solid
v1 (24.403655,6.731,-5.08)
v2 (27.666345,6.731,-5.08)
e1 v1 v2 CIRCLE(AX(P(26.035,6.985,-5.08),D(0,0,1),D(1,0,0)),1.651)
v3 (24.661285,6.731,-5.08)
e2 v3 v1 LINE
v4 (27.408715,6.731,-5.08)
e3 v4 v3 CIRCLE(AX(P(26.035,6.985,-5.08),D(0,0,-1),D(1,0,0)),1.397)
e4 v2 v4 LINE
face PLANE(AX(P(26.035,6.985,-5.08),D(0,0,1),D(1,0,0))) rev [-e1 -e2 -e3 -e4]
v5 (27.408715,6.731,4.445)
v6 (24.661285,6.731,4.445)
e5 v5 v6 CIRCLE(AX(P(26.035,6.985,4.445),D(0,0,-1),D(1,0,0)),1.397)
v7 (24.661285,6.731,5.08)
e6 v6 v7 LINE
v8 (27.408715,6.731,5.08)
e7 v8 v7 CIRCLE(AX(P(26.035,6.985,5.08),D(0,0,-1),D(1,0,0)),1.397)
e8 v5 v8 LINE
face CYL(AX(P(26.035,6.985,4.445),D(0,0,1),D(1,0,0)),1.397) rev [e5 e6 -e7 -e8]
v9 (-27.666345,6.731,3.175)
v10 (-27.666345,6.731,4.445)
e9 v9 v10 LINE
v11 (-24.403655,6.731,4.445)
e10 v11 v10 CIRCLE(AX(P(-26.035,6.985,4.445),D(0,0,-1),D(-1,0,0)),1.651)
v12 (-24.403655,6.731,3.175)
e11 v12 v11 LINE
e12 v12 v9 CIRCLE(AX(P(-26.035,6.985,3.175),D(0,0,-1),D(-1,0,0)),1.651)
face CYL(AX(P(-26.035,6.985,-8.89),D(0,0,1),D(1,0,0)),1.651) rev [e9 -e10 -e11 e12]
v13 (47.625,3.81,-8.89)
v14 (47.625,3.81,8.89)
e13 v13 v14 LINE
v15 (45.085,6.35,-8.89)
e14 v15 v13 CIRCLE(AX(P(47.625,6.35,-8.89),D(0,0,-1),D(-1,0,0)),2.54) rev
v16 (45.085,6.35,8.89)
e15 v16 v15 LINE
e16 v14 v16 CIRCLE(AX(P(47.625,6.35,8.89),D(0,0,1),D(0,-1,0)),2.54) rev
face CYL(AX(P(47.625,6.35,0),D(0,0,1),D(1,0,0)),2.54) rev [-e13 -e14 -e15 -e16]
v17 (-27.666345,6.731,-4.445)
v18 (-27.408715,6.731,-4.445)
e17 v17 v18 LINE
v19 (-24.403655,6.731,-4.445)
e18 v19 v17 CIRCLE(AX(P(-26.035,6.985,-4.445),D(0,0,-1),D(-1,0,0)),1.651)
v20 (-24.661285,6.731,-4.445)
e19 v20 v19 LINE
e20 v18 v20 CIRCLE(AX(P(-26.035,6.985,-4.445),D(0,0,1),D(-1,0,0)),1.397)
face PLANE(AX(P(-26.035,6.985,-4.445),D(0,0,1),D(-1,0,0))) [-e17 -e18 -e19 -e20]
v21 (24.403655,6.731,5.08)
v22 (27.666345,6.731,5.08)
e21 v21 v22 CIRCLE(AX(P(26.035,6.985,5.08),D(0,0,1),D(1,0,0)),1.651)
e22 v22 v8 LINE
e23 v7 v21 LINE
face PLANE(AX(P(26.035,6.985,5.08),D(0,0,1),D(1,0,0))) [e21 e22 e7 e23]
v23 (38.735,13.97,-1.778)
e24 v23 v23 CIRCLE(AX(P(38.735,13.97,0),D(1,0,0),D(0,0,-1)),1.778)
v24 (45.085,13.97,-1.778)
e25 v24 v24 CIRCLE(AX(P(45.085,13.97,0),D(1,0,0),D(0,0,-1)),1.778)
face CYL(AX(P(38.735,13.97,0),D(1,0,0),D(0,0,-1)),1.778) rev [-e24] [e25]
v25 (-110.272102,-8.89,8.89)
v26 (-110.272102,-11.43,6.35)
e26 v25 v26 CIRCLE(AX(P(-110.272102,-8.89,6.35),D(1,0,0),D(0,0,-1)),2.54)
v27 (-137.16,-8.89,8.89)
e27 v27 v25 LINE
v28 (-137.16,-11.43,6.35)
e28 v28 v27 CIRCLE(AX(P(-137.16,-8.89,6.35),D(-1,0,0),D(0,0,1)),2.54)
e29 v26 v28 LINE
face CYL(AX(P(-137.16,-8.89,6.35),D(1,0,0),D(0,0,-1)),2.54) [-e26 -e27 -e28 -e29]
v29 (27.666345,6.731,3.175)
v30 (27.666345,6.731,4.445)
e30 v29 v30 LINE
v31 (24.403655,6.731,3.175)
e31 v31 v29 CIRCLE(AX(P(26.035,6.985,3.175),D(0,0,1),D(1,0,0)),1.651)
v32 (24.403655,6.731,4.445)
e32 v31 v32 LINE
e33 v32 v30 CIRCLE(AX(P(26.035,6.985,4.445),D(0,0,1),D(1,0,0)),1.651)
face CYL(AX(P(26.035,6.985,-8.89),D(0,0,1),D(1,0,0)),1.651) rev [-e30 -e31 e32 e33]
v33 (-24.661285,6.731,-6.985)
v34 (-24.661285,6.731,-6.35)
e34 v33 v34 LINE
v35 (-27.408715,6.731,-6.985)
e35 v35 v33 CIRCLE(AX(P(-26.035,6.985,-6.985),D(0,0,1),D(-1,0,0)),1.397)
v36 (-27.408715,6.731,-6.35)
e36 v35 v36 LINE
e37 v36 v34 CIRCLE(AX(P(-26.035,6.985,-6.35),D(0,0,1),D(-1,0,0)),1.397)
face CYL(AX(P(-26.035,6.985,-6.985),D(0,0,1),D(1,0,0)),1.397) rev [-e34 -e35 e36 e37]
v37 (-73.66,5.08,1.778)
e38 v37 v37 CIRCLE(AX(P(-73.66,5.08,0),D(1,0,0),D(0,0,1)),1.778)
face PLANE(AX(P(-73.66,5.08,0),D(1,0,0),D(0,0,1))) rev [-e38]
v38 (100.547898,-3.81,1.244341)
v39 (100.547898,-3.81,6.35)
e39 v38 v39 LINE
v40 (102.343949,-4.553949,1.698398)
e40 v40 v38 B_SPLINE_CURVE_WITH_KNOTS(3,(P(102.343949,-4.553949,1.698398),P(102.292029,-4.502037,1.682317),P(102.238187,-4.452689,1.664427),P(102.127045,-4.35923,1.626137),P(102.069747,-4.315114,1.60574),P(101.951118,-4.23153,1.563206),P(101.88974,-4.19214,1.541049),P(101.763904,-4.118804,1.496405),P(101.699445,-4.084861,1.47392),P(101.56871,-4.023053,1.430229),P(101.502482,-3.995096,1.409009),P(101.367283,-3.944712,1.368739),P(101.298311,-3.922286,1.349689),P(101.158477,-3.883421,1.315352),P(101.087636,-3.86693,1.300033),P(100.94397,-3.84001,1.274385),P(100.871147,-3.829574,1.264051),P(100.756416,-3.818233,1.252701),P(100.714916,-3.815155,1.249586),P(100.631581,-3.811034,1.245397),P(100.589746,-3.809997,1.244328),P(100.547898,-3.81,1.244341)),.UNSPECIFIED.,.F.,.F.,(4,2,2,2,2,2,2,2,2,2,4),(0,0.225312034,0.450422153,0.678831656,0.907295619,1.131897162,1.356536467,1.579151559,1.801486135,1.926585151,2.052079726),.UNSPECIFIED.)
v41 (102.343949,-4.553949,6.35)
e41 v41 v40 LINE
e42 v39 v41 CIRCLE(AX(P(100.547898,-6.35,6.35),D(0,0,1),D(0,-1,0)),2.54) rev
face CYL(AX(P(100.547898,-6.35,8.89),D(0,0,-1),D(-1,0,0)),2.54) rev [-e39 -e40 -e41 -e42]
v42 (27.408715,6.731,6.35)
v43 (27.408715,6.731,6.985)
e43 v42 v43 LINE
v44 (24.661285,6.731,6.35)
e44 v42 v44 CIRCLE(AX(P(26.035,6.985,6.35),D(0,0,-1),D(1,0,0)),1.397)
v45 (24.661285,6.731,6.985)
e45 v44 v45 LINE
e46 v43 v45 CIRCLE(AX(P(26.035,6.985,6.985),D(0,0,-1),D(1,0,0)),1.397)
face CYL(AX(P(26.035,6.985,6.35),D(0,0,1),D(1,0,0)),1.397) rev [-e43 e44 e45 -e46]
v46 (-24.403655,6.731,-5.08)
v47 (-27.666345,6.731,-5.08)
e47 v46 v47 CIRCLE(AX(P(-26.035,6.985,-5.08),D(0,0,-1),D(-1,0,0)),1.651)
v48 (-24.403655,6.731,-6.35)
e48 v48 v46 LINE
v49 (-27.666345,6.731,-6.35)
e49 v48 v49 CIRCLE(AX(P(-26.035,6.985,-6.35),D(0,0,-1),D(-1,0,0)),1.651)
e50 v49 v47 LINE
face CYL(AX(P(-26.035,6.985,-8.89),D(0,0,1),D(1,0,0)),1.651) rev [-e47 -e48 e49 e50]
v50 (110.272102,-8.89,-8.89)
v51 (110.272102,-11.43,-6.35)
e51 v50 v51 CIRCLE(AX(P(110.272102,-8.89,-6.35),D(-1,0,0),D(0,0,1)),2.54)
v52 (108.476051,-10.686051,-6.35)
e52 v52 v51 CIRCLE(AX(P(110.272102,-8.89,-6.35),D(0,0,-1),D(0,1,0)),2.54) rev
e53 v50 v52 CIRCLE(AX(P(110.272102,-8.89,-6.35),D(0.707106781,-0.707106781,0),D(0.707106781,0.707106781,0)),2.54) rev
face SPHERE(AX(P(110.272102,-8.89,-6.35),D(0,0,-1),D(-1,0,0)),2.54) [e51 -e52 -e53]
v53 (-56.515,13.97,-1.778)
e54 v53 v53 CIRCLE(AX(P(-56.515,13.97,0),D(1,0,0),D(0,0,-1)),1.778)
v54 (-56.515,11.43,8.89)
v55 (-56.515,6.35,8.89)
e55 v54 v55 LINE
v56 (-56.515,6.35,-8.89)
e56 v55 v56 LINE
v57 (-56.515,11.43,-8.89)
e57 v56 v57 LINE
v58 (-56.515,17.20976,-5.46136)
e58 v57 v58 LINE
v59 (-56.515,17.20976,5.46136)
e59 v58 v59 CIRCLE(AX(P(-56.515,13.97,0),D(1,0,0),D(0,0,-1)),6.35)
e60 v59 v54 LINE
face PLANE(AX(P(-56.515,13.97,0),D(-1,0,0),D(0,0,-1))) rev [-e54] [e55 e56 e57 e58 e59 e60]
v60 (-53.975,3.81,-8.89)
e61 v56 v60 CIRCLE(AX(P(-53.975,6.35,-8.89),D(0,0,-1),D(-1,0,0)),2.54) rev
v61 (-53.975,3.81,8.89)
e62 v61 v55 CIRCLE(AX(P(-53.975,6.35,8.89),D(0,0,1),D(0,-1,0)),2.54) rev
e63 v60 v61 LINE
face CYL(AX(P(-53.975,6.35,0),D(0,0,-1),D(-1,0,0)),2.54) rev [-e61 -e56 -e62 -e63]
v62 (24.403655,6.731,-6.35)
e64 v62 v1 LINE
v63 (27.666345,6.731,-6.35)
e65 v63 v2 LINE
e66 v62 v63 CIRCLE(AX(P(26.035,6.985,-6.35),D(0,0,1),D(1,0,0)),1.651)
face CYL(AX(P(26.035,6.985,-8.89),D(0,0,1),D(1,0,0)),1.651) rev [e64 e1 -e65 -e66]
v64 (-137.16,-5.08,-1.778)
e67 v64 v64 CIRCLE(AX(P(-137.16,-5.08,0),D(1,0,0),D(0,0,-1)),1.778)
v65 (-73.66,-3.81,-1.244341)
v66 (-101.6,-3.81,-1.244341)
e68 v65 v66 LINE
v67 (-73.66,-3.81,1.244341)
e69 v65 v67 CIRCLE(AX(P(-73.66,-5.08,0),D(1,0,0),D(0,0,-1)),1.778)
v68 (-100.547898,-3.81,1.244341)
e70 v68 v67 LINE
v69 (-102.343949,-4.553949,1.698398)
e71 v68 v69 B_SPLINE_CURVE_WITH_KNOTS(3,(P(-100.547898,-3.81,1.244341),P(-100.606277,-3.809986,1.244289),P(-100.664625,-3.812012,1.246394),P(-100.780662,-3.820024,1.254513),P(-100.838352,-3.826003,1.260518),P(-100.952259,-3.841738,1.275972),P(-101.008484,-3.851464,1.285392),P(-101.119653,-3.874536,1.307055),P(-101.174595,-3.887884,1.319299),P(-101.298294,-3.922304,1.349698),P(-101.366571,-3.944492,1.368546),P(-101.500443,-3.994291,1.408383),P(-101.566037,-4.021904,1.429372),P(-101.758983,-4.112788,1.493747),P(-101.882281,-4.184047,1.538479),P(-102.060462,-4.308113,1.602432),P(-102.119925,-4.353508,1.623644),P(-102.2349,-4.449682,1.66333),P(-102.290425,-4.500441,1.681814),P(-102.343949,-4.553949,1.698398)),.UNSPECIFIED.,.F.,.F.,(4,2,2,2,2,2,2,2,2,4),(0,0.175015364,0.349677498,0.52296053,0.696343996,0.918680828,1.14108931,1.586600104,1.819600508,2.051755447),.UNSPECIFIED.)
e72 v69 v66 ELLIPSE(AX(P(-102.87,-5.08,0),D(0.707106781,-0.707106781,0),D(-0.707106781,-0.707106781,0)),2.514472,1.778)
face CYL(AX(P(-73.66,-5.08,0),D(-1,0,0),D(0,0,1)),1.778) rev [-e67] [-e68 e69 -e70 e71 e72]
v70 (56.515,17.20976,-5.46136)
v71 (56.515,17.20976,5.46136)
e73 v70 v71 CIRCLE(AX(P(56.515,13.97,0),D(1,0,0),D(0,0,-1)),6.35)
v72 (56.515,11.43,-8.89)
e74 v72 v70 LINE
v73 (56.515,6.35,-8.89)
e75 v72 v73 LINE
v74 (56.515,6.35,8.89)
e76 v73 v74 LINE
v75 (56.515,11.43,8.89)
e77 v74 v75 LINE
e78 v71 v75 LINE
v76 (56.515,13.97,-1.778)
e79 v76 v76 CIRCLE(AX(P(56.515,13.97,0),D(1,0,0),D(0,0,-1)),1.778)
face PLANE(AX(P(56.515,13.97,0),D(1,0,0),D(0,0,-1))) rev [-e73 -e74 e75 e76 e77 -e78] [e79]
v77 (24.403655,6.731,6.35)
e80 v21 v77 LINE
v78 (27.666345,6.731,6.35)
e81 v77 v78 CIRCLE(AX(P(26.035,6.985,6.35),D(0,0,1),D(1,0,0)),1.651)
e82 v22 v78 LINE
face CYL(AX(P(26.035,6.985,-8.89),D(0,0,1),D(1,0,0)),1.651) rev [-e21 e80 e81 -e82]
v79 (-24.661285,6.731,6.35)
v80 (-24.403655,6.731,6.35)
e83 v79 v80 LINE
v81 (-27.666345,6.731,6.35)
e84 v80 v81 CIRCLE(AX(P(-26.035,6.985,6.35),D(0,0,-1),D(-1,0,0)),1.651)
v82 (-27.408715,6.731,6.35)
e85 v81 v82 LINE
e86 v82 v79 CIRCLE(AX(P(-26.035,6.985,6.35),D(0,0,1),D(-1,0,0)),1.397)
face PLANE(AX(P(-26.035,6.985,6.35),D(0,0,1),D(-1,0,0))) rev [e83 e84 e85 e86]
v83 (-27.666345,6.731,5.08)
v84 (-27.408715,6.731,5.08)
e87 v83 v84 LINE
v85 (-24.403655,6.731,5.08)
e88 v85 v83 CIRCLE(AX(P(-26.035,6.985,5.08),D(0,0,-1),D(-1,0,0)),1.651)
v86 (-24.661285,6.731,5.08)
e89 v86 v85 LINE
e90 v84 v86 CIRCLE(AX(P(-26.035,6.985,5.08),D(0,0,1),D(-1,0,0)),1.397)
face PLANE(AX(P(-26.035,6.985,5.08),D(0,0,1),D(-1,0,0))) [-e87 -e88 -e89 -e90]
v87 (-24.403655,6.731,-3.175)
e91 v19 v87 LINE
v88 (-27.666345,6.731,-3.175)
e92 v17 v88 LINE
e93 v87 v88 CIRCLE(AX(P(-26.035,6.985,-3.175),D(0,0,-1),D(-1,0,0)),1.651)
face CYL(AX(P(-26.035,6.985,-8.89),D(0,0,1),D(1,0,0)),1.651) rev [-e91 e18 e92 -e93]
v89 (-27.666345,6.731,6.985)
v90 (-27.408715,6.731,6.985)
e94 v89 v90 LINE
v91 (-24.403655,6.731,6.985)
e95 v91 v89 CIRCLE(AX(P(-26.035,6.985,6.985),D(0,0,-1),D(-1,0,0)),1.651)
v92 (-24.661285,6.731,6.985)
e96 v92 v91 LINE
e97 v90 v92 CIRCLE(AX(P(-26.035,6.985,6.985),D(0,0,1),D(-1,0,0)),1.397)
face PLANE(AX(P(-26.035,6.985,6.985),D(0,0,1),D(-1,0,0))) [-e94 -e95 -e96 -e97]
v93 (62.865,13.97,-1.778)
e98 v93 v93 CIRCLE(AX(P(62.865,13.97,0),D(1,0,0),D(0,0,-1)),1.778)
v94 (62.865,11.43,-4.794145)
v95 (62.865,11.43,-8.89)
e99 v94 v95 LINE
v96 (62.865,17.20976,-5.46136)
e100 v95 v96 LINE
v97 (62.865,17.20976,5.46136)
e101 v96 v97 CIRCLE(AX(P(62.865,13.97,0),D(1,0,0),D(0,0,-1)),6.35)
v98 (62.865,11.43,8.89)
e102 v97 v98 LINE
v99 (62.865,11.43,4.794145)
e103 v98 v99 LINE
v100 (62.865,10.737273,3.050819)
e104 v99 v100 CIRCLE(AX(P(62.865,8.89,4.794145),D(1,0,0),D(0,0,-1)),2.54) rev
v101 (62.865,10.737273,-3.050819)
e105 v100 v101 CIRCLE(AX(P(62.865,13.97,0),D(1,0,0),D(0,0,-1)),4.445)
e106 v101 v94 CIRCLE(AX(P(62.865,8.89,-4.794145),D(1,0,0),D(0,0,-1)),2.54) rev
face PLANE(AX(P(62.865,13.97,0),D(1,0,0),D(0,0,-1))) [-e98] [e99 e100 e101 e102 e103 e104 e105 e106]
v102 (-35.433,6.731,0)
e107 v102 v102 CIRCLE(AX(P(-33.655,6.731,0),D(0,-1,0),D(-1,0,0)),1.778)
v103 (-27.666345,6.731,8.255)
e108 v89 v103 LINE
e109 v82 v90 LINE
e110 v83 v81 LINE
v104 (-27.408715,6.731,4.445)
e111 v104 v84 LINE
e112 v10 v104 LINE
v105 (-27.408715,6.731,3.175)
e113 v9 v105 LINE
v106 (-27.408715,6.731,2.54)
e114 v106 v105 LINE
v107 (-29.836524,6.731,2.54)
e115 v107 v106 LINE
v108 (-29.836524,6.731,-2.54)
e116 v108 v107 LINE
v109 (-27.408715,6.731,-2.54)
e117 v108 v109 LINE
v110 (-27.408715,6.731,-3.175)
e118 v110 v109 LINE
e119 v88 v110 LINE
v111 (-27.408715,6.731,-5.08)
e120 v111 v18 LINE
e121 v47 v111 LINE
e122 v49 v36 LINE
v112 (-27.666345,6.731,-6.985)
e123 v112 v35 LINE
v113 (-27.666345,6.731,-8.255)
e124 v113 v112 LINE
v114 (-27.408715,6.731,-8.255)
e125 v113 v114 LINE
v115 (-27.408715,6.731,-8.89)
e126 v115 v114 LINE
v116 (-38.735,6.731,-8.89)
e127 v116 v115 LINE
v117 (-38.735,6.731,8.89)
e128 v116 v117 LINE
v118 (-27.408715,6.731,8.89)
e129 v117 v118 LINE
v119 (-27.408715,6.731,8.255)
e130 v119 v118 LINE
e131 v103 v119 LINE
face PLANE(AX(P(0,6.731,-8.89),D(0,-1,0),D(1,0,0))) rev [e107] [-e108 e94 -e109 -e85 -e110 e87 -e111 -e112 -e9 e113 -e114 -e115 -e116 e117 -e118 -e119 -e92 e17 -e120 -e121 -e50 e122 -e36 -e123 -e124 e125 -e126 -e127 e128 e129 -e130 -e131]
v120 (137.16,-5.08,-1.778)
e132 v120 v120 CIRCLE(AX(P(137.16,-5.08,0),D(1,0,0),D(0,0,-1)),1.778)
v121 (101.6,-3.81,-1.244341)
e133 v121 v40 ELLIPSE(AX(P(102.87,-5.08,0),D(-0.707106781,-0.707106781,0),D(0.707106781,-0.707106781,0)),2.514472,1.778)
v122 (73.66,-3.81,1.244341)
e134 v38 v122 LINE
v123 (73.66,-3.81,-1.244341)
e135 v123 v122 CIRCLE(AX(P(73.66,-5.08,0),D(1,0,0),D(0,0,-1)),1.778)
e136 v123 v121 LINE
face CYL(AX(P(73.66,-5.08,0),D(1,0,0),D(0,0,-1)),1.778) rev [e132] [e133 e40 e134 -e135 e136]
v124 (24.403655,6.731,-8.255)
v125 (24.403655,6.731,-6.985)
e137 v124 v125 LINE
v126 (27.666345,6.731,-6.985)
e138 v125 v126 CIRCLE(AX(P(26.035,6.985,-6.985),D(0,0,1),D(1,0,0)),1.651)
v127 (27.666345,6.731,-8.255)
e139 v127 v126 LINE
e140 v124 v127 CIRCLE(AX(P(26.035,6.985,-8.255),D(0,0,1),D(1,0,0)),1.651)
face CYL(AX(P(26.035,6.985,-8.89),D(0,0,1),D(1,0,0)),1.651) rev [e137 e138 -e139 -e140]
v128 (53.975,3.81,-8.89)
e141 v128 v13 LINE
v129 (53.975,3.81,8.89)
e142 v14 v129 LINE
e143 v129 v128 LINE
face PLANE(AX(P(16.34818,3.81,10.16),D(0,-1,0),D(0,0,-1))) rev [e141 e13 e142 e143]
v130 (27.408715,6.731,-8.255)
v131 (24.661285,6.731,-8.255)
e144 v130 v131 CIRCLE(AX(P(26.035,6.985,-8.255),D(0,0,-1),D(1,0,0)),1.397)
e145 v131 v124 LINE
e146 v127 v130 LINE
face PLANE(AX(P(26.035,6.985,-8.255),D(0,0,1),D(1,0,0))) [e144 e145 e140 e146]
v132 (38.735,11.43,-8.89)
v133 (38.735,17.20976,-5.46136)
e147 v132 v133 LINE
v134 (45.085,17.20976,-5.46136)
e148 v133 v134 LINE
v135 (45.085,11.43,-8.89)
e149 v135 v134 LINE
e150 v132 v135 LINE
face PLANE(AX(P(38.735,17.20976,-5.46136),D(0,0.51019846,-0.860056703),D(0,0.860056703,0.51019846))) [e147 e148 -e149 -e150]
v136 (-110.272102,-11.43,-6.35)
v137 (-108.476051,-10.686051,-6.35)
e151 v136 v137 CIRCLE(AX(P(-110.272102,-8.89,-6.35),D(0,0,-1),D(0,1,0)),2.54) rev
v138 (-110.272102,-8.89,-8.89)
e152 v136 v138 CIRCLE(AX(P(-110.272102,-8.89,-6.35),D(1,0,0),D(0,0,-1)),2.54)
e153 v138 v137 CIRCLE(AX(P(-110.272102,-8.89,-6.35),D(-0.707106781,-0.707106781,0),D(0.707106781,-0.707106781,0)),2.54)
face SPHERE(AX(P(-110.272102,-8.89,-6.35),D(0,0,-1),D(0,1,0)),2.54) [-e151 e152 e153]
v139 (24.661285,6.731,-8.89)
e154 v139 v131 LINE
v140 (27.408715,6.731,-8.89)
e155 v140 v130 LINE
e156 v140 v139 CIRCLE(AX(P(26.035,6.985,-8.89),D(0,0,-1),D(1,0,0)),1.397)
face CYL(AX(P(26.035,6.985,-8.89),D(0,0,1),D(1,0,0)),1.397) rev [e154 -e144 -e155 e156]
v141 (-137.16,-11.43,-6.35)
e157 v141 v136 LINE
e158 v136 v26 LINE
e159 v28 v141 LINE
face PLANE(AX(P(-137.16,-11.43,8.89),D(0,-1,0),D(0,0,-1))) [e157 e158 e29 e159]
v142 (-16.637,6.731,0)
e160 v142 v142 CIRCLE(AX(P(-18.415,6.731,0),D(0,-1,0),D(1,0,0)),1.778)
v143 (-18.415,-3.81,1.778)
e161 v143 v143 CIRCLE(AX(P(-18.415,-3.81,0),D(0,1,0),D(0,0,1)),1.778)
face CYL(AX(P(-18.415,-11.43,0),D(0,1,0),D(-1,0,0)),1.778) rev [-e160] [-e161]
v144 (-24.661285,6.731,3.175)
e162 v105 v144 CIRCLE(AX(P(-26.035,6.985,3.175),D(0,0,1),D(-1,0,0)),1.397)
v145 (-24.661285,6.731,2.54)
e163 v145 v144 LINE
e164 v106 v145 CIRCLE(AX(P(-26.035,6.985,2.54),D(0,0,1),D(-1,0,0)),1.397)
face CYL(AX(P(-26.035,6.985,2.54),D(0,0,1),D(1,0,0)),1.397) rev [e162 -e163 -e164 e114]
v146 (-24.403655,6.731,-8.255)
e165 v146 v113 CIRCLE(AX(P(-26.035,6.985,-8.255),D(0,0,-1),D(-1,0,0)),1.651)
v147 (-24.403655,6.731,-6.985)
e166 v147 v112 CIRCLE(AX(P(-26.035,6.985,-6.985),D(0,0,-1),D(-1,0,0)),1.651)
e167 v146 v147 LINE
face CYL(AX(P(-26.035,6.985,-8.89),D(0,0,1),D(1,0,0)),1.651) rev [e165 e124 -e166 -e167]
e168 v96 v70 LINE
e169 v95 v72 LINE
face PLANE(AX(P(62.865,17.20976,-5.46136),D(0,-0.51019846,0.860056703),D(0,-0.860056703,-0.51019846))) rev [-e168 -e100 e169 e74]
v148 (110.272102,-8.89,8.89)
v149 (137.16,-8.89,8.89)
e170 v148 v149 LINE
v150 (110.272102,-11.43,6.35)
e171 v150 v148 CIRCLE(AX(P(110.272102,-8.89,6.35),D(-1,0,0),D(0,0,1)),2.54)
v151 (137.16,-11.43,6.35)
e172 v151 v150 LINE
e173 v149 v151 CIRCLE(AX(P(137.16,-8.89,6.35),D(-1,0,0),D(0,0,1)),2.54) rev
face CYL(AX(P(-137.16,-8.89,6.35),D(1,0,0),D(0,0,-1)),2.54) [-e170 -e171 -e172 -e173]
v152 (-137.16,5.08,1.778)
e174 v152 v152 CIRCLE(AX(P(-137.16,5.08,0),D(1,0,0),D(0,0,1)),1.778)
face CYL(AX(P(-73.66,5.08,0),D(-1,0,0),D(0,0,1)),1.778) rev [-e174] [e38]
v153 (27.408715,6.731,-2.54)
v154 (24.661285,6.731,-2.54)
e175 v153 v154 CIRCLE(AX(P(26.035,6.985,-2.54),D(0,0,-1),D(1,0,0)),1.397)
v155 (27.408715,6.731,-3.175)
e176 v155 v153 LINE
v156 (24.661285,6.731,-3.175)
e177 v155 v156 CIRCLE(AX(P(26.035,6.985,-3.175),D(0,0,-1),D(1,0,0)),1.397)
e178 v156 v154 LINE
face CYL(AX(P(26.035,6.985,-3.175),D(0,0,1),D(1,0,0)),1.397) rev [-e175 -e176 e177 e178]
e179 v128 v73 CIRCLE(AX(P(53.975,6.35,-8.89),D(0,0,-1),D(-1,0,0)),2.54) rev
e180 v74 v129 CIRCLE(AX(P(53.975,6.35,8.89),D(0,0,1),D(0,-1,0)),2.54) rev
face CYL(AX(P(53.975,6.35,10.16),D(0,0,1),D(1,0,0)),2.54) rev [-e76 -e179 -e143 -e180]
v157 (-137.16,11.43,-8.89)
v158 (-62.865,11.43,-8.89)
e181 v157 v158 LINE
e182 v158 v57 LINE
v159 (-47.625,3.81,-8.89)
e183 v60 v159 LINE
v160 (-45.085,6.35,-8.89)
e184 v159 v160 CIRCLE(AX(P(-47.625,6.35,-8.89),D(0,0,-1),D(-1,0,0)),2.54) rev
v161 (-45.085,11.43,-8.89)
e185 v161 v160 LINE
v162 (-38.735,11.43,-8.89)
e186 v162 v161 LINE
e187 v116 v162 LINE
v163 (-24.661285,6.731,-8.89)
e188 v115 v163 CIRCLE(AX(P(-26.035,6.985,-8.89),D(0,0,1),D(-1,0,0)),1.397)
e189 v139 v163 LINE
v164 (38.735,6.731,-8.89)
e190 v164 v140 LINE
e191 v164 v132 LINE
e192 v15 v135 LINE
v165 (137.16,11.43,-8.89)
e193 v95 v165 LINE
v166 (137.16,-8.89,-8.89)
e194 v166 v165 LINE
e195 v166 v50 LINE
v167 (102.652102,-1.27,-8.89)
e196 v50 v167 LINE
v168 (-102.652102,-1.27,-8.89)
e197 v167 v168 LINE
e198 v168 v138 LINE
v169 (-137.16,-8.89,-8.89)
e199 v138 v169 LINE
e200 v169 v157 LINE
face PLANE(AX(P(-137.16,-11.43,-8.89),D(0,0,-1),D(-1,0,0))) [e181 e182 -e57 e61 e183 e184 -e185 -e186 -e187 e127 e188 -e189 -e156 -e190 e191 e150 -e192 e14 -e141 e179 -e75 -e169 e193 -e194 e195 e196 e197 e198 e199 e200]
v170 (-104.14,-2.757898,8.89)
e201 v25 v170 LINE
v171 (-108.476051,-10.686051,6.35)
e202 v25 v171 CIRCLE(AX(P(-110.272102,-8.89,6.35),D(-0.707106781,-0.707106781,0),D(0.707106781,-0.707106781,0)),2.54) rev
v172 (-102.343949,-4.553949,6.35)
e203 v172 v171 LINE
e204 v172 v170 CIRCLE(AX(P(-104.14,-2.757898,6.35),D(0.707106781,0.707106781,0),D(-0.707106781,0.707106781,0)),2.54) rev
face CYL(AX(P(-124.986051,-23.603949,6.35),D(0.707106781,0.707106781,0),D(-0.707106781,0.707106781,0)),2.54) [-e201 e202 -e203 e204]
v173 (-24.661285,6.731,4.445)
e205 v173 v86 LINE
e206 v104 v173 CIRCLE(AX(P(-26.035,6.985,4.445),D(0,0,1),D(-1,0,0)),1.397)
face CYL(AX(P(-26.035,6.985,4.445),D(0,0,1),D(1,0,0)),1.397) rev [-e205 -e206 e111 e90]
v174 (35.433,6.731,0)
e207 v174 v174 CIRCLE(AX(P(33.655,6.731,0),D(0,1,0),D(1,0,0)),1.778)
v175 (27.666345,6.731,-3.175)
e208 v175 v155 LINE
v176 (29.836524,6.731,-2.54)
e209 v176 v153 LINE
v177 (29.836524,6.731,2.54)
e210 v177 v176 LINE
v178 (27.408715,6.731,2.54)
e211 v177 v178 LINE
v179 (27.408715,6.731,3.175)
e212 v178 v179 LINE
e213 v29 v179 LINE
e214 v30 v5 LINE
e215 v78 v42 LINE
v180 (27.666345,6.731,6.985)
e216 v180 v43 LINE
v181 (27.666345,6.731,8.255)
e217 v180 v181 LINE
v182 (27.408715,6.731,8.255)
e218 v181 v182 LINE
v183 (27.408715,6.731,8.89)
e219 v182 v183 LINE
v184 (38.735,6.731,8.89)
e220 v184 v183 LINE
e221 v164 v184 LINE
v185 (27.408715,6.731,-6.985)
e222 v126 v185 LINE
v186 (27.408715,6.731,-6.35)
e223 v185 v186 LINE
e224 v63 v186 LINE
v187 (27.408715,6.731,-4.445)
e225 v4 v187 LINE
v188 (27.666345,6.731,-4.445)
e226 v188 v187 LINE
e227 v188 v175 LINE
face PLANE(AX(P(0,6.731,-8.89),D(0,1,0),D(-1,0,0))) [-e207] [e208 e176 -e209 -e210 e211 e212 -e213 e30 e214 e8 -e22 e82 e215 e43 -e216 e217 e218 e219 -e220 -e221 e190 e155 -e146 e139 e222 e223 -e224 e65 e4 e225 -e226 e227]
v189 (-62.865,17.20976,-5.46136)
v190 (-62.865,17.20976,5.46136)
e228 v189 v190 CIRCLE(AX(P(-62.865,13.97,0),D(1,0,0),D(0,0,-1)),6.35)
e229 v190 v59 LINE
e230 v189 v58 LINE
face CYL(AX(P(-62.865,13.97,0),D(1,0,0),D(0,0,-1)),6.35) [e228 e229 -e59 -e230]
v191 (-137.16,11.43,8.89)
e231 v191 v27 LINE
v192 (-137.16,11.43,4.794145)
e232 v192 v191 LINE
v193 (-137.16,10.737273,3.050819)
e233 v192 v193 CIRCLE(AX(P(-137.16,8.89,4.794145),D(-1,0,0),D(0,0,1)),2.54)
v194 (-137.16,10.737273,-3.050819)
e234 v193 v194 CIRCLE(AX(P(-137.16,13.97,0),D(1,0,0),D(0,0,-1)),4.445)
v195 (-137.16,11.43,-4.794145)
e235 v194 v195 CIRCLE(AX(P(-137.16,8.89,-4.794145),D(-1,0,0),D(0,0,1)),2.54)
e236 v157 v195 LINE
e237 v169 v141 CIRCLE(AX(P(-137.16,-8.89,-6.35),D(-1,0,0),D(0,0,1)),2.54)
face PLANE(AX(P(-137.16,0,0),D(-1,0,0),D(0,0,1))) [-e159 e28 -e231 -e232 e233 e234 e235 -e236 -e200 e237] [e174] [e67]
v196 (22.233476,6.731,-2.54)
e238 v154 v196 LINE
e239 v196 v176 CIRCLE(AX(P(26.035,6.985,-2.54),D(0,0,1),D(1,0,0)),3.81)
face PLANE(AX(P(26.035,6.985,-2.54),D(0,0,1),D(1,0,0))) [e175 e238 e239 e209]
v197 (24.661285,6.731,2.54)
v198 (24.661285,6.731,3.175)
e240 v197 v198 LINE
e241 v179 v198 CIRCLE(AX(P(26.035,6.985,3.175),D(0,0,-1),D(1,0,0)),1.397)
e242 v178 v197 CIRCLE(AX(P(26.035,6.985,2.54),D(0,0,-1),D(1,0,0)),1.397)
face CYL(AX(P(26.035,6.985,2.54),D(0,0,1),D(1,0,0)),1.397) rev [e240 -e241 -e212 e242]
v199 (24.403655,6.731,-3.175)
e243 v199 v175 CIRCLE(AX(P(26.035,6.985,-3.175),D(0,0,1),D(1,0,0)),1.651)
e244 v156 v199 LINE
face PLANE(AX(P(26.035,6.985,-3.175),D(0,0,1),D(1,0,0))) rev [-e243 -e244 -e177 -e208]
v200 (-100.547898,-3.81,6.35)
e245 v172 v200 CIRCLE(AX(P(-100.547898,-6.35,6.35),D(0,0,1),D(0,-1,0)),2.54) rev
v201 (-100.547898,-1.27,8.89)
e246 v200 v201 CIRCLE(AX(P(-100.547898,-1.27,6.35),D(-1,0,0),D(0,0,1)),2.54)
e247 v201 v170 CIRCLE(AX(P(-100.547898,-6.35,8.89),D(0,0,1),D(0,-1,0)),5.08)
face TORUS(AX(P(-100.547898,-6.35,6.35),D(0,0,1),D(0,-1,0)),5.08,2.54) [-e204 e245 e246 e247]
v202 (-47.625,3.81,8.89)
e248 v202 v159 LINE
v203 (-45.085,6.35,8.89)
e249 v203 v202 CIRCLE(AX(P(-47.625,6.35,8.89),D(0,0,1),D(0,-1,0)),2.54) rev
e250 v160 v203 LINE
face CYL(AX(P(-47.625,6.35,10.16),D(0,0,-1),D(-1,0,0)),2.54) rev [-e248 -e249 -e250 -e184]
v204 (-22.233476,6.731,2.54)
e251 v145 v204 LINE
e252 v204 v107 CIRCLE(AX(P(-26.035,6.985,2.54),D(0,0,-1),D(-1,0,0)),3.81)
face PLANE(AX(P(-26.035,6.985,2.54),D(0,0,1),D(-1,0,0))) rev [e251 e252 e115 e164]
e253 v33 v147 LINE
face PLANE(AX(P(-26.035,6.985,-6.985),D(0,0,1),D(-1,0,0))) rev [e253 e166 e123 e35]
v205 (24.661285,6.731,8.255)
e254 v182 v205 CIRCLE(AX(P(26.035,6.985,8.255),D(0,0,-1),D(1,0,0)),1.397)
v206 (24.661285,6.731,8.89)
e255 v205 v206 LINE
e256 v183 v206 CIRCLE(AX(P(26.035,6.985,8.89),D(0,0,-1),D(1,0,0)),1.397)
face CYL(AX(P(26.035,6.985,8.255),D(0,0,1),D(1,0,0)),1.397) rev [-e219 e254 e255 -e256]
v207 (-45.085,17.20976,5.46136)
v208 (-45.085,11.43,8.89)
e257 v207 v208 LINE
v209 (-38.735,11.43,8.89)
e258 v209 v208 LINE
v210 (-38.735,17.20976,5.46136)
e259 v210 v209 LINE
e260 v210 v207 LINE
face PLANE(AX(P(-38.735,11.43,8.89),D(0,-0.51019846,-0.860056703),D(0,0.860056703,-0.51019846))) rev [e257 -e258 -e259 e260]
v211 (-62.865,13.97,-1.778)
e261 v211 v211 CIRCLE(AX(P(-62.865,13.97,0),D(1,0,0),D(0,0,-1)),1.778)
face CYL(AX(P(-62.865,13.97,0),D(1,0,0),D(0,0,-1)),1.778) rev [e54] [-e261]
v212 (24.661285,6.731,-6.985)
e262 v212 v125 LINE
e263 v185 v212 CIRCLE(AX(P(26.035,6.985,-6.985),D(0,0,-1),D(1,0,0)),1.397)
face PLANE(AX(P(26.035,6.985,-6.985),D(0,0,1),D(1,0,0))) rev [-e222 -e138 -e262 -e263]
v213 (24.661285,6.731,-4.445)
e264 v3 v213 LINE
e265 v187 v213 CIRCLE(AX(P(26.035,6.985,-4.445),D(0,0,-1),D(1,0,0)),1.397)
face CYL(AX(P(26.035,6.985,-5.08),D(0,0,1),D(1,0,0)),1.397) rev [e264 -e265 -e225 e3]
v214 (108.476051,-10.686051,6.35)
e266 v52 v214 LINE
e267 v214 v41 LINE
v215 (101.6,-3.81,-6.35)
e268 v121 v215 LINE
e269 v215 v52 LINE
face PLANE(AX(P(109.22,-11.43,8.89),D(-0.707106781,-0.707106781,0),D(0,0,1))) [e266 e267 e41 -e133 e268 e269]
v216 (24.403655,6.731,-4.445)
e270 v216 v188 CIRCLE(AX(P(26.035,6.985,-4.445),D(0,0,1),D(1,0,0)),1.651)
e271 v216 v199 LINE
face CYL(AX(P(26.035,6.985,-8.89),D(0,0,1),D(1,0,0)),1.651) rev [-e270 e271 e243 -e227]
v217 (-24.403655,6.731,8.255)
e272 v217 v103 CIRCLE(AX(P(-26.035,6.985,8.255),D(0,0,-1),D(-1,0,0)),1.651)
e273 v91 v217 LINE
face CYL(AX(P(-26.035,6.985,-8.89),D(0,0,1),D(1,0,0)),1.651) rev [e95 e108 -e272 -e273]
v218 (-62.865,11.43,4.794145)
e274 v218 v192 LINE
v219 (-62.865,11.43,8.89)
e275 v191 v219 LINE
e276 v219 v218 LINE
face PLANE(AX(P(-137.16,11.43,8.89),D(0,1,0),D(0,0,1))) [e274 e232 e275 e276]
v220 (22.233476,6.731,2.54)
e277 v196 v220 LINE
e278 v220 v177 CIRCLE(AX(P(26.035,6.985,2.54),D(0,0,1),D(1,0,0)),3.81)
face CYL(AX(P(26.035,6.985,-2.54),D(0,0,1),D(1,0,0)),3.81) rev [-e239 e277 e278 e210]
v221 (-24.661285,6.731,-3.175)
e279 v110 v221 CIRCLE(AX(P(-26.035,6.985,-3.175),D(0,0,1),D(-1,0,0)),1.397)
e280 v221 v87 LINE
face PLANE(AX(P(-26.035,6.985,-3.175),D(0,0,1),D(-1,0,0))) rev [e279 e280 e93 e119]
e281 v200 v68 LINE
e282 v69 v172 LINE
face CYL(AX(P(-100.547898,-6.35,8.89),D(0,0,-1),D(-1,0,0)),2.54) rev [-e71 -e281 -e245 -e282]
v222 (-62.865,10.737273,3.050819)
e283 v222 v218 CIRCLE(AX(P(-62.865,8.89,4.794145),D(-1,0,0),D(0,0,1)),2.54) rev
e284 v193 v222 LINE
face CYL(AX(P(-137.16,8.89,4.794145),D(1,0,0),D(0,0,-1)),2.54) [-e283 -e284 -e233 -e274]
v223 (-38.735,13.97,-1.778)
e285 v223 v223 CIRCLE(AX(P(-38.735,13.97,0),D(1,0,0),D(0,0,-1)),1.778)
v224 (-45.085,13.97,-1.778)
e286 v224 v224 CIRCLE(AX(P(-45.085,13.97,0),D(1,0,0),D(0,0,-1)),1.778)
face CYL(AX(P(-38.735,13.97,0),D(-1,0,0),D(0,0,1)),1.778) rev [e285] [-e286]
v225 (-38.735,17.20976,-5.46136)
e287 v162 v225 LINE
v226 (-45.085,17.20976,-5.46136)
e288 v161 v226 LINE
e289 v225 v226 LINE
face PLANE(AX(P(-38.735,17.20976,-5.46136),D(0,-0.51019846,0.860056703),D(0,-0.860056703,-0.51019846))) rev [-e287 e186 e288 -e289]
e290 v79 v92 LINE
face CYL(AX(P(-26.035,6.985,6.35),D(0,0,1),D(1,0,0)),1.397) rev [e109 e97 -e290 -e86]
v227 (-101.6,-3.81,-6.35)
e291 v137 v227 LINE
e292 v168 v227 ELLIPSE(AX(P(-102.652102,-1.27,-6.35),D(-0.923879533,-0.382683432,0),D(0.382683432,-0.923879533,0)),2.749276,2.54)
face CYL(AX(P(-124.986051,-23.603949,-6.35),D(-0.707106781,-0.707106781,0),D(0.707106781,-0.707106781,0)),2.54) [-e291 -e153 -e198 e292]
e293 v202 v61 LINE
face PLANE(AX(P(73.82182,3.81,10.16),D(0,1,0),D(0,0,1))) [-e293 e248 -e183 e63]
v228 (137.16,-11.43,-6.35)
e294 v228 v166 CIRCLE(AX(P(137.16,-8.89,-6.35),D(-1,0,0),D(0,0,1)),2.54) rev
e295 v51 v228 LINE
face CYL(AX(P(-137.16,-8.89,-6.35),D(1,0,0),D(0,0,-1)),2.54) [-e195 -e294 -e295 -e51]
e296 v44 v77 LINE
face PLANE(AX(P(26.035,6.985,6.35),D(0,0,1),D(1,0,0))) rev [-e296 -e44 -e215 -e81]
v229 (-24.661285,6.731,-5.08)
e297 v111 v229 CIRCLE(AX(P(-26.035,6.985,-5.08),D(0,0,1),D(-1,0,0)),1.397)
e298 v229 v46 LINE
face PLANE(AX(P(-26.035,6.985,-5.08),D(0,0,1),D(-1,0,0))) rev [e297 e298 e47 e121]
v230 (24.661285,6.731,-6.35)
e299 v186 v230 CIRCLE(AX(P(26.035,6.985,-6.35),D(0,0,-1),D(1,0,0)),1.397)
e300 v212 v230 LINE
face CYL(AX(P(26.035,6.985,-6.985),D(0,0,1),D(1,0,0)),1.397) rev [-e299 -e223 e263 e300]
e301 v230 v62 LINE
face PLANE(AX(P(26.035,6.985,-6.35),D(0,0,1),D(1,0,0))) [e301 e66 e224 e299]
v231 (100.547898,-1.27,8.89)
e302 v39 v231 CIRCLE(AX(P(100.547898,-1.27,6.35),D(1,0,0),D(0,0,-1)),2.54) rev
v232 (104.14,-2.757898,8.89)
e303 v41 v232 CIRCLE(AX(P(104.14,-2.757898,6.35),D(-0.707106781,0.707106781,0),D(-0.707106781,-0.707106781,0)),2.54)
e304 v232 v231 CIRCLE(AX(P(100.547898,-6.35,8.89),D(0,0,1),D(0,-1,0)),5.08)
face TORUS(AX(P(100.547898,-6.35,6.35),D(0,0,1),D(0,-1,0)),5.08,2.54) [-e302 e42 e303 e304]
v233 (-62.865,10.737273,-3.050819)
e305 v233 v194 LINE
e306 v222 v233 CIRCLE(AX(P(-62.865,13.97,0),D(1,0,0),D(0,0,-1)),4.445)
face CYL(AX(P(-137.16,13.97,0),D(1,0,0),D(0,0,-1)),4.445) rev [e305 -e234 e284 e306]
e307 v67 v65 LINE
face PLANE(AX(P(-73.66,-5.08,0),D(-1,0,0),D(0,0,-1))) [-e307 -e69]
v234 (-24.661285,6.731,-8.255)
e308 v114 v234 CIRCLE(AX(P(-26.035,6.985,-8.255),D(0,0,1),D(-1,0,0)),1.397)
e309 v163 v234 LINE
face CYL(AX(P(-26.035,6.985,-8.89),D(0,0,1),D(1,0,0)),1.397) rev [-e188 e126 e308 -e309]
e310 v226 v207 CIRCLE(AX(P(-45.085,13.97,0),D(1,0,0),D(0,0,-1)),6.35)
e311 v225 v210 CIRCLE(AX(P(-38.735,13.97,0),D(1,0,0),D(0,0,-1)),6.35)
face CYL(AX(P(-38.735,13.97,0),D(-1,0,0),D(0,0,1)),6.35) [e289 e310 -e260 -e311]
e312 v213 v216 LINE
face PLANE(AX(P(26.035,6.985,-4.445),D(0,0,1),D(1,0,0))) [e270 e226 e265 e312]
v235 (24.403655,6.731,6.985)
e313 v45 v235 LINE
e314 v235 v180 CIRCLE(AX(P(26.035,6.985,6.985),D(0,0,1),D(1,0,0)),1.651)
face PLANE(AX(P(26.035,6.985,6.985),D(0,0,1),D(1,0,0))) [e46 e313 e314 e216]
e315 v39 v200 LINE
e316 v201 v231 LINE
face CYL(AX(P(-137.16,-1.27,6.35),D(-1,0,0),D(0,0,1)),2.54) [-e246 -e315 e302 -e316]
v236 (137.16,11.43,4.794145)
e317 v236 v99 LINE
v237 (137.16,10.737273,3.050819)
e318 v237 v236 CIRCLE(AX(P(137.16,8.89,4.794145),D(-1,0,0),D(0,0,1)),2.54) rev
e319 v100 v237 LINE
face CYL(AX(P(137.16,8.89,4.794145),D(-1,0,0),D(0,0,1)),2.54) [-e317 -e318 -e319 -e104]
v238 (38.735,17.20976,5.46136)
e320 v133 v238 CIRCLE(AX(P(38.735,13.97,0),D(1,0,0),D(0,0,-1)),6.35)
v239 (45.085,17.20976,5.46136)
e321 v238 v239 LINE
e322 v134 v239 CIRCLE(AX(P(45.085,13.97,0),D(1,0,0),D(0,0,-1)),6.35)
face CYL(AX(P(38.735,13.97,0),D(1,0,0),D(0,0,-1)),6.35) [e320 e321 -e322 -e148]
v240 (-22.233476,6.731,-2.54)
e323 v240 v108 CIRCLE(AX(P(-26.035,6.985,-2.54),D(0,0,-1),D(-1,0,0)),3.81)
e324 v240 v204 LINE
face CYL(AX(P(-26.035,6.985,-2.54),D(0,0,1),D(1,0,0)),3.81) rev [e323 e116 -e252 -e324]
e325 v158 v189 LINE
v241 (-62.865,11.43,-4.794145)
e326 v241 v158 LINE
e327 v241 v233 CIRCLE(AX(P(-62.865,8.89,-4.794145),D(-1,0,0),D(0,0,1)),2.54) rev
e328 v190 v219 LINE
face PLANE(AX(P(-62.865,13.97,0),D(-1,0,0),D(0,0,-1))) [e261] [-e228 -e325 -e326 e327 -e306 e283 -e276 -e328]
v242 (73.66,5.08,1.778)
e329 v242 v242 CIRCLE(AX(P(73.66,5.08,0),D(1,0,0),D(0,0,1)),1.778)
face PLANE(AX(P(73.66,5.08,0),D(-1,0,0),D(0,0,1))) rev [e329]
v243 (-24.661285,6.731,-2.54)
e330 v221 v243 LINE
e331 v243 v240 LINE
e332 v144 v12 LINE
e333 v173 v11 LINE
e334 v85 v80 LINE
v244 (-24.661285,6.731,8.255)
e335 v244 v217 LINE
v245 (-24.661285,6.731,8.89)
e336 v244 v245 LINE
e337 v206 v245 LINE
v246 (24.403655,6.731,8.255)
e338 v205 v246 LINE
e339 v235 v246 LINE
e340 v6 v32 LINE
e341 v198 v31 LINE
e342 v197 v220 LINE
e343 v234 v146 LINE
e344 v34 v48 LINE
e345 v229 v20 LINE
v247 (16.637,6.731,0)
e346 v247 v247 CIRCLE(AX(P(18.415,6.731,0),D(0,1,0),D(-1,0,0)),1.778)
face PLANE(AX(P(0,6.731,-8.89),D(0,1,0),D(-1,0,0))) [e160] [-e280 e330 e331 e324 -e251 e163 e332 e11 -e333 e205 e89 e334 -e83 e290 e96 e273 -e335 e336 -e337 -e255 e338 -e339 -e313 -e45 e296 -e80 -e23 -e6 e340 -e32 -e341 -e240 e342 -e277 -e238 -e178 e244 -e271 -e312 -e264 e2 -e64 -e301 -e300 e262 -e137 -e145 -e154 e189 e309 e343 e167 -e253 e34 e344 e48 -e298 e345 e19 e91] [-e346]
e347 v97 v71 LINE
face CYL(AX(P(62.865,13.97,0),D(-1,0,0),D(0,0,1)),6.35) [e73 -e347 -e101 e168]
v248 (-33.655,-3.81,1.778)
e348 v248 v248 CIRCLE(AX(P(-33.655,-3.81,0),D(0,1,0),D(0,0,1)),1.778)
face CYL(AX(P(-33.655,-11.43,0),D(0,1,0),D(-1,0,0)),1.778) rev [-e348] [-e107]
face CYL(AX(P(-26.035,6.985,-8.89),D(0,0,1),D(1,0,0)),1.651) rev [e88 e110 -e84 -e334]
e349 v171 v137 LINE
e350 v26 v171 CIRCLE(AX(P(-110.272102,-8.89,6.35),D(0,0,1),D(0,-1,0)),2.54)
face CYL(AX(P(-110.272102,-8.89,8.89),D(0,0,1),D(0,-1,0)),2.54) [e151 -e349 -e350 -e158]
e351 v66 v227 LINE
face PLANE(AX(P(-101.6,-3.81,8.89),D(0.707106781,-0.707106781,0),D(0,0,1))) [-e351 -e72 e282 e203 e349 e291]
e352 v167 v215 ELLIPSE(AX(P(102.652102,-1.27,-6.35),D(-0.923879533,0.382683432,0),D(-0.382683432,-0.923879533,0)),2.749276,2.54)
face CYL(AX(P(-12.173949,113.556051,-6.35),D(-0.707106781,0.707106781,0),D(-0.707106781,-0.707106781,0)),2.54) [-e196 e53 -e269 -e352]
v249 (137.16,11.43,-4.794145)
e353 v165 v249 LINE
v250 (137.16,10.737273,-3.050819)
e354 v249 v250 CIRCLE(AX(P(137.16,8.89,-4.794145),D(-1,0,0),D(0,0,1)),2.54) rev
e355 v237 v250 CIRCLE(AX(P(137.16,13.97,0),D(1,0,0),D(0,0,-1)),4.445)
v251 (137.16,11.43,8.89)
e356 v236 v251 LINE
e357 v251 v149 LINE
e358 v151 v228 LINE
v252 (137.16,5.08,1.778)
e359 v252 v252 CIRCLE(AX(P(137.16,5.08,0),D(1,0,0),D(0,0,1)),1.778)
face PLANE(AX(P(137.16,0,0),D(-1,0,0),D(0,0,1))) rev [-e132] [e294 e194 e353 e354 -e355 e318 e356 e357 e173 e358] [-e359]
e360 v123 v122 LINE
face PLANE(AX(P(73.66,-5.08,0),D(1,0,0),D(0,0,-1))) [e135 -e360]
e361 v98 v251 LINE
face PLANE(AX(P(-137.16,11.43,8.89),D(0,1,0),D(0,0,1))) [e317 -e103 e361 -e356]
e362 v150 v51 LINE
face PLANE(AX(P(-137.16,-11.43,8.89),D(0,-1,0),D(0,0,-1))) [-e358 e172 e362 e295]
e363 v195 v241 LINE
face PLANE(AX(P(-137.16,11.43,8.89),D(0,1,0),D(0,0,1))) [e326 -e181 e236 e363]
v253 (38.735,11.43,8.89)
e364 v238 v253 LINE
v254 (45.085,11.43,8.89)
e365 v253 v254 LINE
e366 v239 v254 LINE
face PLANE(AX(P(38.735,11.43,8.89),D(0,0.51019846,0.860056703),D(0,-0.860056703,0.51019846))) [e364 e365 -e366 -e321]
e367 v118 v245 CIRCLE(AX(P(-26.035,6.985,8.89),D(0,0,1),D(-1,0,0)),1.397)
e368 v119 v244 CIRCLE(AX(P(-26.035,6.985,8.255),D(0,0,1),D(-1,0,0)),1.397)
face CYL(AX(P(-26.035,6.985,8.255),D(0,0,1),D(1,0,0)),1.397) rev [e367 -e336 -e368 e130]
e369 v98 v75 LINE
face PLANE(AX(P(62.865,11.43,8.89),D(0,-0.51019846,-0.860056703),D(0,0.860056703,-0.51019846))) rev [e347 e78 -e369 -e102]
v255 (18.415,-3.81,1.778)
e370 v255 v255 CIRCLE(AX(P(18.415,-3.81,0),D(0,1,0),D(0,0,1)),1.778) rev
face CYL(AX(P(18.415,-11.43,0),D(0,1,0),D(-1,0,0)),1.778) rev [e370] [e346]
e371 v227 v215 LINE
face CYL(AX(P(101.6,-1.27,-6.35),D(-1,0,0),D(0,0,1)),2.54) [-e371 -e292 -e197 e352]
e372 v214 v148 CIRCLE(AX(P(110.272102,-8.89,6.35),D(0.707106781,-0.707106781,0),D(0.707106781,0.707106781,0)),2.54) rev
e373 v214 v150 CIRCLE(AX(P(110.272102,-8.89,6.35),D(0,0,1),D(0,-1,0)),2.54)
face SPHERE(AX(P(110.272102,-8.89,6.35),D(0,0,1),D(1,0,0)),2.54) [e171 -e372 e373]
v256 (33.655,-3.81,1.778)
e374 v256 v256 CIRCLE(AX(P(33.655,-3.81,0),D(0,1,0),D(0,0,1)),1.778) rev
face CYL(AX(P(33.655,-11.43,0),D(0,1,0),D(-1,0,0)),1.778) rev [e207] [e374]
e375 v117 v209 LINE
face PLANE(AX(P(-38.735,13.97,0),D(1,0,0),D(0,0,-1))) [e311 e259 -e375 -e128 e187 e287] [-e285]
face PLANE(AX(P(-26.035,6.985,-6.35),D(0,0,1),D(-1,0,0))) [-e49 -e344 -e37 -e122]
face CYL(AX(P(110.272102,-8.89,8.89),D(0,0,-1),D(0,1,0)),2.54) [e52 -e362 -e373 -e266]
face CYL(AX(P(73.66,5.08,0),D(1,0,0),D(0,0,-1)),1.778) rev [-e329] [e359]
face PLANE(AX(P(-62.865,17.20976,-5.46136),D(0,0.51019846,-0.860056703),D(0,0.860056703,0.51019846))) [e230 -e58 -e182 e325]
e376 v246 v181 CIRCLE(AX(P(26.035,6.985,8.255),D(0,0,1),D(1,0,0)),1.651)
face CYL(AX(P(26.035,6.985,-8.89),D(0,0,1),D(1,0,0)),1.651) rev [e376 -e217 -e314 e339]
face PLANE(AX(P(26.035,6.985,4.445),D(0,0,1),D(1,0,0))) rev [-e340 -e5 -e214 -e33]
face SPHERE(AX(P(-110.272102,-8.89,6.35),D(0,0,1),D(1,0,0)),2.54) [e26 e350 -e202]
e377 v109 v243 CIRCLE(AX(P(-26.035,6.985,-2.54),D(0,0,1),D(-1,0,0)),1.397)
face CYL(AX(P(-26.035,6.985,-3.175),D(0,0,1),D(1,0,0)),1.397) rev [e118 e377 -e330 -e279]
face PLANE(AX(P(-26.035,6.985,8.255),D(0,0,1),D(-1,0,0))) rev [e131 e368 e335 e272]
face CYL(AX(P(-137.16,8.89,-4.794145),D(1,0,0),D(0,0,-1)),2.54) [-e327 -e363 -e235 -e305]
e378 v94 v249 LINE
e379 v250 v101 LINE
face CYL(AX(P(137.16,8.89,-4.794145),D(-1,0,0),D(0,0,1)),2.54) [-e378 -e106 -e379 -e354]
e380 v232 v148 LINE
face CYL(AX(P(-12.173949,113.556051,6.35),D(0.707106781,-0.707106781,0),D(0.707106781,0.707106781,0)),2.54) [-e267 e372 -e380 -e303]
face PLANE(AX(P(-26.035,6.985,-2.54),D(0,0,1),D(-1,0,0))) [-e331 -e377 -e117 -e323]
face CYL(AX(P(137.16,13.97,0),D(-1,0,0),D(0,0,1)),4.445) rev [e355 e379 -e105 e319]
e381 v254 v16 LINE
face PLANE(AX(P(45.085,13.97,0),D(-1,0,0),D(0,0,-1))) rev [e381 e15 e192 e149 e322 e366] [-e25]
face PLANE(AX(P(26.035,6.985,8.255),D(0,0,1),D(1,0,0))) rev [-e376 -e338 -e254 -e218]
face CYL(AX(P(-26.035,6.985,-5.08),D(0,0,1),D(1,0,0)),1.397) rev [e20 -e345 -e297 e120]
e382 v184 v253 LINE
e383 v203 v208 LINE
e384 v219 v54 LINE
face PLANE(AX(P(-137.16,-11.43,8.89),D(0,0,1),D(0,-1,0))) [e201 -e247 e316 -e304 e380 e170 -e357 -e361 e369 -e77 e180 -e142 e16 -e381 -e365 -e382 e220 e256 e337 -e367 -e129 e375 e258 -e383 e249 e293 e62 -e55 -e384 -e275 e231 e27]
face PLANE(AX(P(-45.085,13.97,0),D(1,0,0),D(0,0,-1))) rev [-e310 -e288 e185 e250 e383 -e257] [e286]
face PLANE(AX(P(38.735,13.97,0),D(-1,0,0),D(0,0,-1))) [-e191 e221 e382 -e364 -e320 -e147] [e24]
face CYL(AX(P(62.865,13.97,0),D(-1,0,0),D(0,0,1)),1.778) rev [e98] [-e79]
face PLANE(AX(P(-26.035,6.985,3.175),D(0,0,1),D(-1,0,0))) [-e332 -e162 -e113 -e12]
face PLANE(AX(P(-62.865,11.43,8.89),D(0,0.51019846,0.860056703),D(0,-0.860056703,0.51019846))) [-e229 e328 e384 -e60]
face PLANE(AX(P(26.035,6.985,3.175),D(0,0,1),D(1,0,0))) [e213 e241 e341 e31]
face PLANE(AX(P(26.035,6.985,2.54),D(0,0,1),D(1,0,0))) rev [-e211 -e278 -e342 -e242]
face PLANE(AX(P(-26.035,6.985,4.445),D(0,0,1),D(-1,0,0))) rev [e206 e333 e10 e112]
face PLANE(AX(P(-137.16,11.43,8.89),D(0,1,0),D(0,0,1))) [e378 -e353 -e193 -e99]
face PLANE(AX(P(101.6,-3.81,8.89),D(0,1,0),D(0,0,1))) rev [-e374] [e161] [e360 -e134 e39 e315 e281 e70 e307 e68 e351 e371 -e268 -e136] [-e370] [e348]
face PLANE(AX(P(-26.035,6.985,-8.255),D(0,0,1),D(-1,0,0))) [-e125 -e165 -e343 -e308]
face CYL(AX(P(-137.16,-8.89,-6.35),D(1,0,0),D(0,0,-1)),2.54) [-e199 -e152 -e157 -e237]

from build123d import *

# Parameters (mm, degrees)
SKETCH1_W           = 17.78
SKETCH1_H           = 22.86
BOSS_EXTRUDE1_DEPTH = 137.16
SKETCH3_R           = 1.778
CUT_EXTRUDE2_DEPTH  = 63.5
SKETCH4_R           = 1.778
BOSS_EXTRUDE2_DEPTH = 6.35
CUT_EXTRUDE3_DEPTH  = 11.43
CUT_EXTRUDE5_DEPTH  = 140.792333123
SKETCH8_R           = 1.778
CUT_EXTRUDE6_DEPTH  = 139.642416385
BOSS_EXTRUDE3_DEPTH = 0.635
LPATTERN1_COUNT     = 10
LPATTERN1_PITCH     = 1.905
SKETCH10_R          = 3.81
CUT_EXTRUDE7_DEPTH  = 2.54
SKETCH11_R          = 4.445
CUT_EXTRUDE8_DEPTH  = 202.250925774
SKETCH12_W          = 203.2
SKETCH12_H          = 7.62
CUT_EXTRUDE9_DEPTH  = 140.792333123
CHAMFER1_SIZE       = 7.62
FILLET1_R           = 2.54


# Read off the part's stored shape, not the designer's step: Mirror2
with BuildPart() as part:
    # Sketch1 → Boss-Extrude1 (new, symmetric)
    with BuildSketch(Plane(origin=(0, 0, 0), x_dir=(0, 0, -1), z_dir=(1, 0, 0))):
        Rectangle(SKETCH1_W, SKETCH1_H)
    extrude(amount=BOSS_EXTRUDE1_DEPTH, both=True)

    # Sketch3 → Cut-Extrude2 (cut)
    with BuildSketch(Plane(origin=(137.16, 0, 0), x_dir=(0, 0, -1), z_dir=(1, 0, 0))):
        with Locations((0, -5.08)):
            Circle(SKETCH3_R)
        with Locations(Location((0, 5.08, 0), (0, 0, 180))):
            Circle(SKETCH3_R)
    extrude(amount=-CUT_EXTRUDE2_DEPTH, mode=Mode.SUBTRACT)

    # Sketch4 → Boss-Extrude2 (add)
    with BuildSketch(Plane(origin=(56.515, 0, 0), x_dir=(0, 0, -1), z_dir=(1, 0, 0))):
        with BuildLine():
            Line((-8.89, 11.43), (-5.461360062, 17.209760218))
            ThreePointArc((-5.461360062, 17.209760218), (0, 20.32), (5.461360062, 17.209760218))
            Line((5.461360062, 17.209760218), (8.89, 11.43))
            Line((8.89, 11.43), (-8.89, 11.43))
        make_face()
        with Locations((0, 13.97)):
            Circle(SKETCH4_R, mode=Mode.SUBTRACT)
    boss_extrude2 = extrude(amount=BOSS_EXTRUDE2_DEPTH)

    # Mirror1: Boss-Extrude2 across plane
    add(boss_extrude2.mirror(Plane.ZY.offset(-50.8)))

    # Sketch5 → Cut-Extrude3 (cut)
    with BuildSketch(Plane(origin=(56.515, 0, 0), x_dir=(0, 0, -1), z_dir=(1, 0, 0))):
        with BuildLine():
            Line((-10.16, 13.97), (-10.16, 3.81))
            Line((-10.16, 3.81), (10.16, 3.81))
            Line((10.16, 3.81), (10.16, 13.97))
            ThreePointArc((10.16, 13.97), (0, 24.13), (-10.16, 13.97))
        make_face()
    extrude(amount=-CUT_EXTRUDE3_DEPTH, mode=Mode.SUBTRACT)

    # Sketch6 → Cut-Extrude5 (cut, through all)
    with BuildSketch(Plane.XY.offset(8.89)):
        with BuildLine():
            ThreePointArc((24.403655463, 6.731), (26.035, 5.334), (27.666344537, 6.731))
            Line((27.666344537, 6.731), (24.403655463, 6.731))
        make_face()
        with BuildLine():
            Line((24.403655463, 6.731), (27.666344537, 6.731))
            ThreePointArc((27.666344537, 6.731), (27.6810788, 6.857620314), (27.686, 6.985))
            ThreePointArc((27.686, 6.985), (25.907620314, 8.6310788), (24.403655463, 6.731))
        make_face()
        with BuildLine():
            Line((27.666344537, 6.731), (38.735, 6.731))
            Line((38.735, 6.731), (38.735, 11.43))
            Line((38.735, 11.43), (0, 11.43))
            Line((0, 11.43), (0, 6.731))
            Line((0, 6.731), (24.403655463, 6.731))
            ThreePointArc((24.403655463, 6.731), (25.907620314, 8.6310788), (27.686, 6.985))
            ThreePointArc((27.686, 6.985), (27.6810788, 6.857620314), (27.666344537, 6.731))
        make_face()
    extrude(amount=-CUT_EXTRUDE5_DEPTH, mode=Mode.SUBTRACT)

    # Sketch8 → Cut-Extrude6 (cut, through all)
    with BuildSketch(Plane(origin=(0, 6.731, 0), x_dir=(1, 0, 0), z_dir=(0, 1, 0))):
        with Locations(Location((18.415, 0, 0), (0, 0, 180))):
            Circle(SKETCH8_R)
        with Locations((33.655, 0)):
            Circle(SKETCH8_R)
    extrude(amount=-CUT_EXTRUDE6_DEPTH, mode=Mode.SUBTRACT)

    # Sketch9 → Boss-Extrude3 (add)
    with BuildSketch(Plane.XY.offset(8.89)):
        with BuildLine():
            Line((24.403655463, 6.731), (24.661284964, 6.731))
            ThreePointArc((24.661284964, 6.731), (26.035, 5.588), (27.408715036, 6.731))
            Line((27.408715036, 6.731), (27.666344537, 6.731))
            ThreePointArc((27.666344537, 6.731), (26.035, 5.334), (24.403655463, 6.731))
        make_face()
    boss_extrude3 = extrude(amount=-BOSS_EXTRUDE3_DEPTH)

    # LPattern1: Boss-Extrude3 ×10
    with Locations(*[(0, 0, -i * LPATTERN1_PITCH) for i in range(1, LPATTERN1_COUNT)]):
        add(boss_extrude3)

    # Sketch10 → Cut-Extrude7 (cut, symmetric)
    with BuildSketch(Plane.XY):
        with Locations((26.035, 6.985)):
            Circle(SKETCH10_R)
    extrude(amount=CUT_EXTRUDE7_DEPTH, both=True, mode=Mode.SUBTRACT)

    # Sketch11 → Cut-Extrude8 (cut, through all)
    with BuildSketch(Plane(origin=(62.865, 0, 0), x_dir=(0, 0, -1), z_dir=(1, 0, 0))):
        with Locations((0, 13.97)):
            Circle(SKETCH11_R)
    extrude(amount=CUT_EXTRUDE8_DEPTH, mode=Mode.SUBTRACT)

    # Mirror2
    split(bisect_by=Plane(origin=(0, 0, 0), x_dir=(0, 0, 1), z_dir=(1, 0, 0)), keep=Keep.TOP)

    # Mirror2 2: part across plane


with BuildPart() as part_1:
    add(part.part)
    add(part.part.mirror(Plane(origin=(0, 0, 0), x_dir=(0, 0, 1), z_dir=(1, 0, 0))))

    # Sketch12 → Cut-Extrude9 (cut, through all)
    with BuildSketch(Plane(origin=(0, 0, -8.89), x_dir=(-1, 0, 0), z_dir=(0, 0, -1))):
        with Locations((0, -7.62)):
            Rectangle(SKETCH12_W, SKETCH12_H)
    extrude(amount=-CUT_EXTRUDE9_DEPTH, mode=Mode.SUBTRACT)

    # Chamfer1
    # the kernel refuses this chamfer: 7.62 mm, written as the material it takes off along each edge
    with BuildSketch(Plane(origin=(-101.6, -11.43, -28.486224368), x_dir=(-0.9996219169112968, -0.02749587661058636, 0), z_dir=(0, 0, 1))) as chamfer1_piece_1:
        Polygon((CHAMFER1_SIZE * 0.999621916911, -CHAMFER1_SIZE * 0.0274958766106), (-CHAMFER1_SIZE * 0.0274958766106, -CHAMFER1_SIZE * 0.999621916911), (0, 0), align=None)
    extrude(amount=56.972448737, mode=Mode.SUBTRACT)
    with BuildSketch(Plane(origin=(101.6, -11.43, -28.486224368), x_dir=(0.9996219169112968, -0.02749587661058636, 0), z_dir=(0, 0, 1))) as chamfer1_piece_2:
        Polygon((CHAMFER1_SIZE * 0.999621916911, CHAMFER1_SIZE * 0.0274958766106), (-CHAMFER1_SIZE * 0.0274958766106, CHAMFER1_SIZE * 0.999621916911), (0, 0), align=None)
    extrude(amount=56.972448737, mode=Mode.SUBTRACT)

    # Fillet1
    fillet1_edges = [part_1.edges().sort_by_distance(p)[0] for p in [
        (100.0125, 11.43, -3.647797281),
        (100.0125, 11.43, 3.647797281),
        (-56.515, 3.81, 0),
        (-45.085, 3.81, 0),
        (-100.0125, 11.43, 3.647797281),
        (-100.0125, 11.43, -3.647797281),
        (101.6, -3.81, 5.067170395),
        (0, -3.81, 8.89),
        (-101.6, -3.81, 5.067170395),
        (0, -3.81, -8.89),
        (123.19, -11.43, -8.89),
        (105.41, -7.62, -8.89),
        (-105.41, -7.62, -8.89),
        (-109.22, -11.43, 0),
        (123.19, -11.43, 8.89),
        (105.41, -7.62, 8.89),
        (-105.41, -7.62, 8.89),
        (109.22, -11.43, 0),
        (56.515, 3.81, 0),
        (45.085, 3.81, 0),
        (-123.19, -11.43, -8.89),
        (-123.19, -11.43, 8.89),
    ]]
    fillet(fillet1_edges, radius=FILLET1_R)


solid = part_1.part
